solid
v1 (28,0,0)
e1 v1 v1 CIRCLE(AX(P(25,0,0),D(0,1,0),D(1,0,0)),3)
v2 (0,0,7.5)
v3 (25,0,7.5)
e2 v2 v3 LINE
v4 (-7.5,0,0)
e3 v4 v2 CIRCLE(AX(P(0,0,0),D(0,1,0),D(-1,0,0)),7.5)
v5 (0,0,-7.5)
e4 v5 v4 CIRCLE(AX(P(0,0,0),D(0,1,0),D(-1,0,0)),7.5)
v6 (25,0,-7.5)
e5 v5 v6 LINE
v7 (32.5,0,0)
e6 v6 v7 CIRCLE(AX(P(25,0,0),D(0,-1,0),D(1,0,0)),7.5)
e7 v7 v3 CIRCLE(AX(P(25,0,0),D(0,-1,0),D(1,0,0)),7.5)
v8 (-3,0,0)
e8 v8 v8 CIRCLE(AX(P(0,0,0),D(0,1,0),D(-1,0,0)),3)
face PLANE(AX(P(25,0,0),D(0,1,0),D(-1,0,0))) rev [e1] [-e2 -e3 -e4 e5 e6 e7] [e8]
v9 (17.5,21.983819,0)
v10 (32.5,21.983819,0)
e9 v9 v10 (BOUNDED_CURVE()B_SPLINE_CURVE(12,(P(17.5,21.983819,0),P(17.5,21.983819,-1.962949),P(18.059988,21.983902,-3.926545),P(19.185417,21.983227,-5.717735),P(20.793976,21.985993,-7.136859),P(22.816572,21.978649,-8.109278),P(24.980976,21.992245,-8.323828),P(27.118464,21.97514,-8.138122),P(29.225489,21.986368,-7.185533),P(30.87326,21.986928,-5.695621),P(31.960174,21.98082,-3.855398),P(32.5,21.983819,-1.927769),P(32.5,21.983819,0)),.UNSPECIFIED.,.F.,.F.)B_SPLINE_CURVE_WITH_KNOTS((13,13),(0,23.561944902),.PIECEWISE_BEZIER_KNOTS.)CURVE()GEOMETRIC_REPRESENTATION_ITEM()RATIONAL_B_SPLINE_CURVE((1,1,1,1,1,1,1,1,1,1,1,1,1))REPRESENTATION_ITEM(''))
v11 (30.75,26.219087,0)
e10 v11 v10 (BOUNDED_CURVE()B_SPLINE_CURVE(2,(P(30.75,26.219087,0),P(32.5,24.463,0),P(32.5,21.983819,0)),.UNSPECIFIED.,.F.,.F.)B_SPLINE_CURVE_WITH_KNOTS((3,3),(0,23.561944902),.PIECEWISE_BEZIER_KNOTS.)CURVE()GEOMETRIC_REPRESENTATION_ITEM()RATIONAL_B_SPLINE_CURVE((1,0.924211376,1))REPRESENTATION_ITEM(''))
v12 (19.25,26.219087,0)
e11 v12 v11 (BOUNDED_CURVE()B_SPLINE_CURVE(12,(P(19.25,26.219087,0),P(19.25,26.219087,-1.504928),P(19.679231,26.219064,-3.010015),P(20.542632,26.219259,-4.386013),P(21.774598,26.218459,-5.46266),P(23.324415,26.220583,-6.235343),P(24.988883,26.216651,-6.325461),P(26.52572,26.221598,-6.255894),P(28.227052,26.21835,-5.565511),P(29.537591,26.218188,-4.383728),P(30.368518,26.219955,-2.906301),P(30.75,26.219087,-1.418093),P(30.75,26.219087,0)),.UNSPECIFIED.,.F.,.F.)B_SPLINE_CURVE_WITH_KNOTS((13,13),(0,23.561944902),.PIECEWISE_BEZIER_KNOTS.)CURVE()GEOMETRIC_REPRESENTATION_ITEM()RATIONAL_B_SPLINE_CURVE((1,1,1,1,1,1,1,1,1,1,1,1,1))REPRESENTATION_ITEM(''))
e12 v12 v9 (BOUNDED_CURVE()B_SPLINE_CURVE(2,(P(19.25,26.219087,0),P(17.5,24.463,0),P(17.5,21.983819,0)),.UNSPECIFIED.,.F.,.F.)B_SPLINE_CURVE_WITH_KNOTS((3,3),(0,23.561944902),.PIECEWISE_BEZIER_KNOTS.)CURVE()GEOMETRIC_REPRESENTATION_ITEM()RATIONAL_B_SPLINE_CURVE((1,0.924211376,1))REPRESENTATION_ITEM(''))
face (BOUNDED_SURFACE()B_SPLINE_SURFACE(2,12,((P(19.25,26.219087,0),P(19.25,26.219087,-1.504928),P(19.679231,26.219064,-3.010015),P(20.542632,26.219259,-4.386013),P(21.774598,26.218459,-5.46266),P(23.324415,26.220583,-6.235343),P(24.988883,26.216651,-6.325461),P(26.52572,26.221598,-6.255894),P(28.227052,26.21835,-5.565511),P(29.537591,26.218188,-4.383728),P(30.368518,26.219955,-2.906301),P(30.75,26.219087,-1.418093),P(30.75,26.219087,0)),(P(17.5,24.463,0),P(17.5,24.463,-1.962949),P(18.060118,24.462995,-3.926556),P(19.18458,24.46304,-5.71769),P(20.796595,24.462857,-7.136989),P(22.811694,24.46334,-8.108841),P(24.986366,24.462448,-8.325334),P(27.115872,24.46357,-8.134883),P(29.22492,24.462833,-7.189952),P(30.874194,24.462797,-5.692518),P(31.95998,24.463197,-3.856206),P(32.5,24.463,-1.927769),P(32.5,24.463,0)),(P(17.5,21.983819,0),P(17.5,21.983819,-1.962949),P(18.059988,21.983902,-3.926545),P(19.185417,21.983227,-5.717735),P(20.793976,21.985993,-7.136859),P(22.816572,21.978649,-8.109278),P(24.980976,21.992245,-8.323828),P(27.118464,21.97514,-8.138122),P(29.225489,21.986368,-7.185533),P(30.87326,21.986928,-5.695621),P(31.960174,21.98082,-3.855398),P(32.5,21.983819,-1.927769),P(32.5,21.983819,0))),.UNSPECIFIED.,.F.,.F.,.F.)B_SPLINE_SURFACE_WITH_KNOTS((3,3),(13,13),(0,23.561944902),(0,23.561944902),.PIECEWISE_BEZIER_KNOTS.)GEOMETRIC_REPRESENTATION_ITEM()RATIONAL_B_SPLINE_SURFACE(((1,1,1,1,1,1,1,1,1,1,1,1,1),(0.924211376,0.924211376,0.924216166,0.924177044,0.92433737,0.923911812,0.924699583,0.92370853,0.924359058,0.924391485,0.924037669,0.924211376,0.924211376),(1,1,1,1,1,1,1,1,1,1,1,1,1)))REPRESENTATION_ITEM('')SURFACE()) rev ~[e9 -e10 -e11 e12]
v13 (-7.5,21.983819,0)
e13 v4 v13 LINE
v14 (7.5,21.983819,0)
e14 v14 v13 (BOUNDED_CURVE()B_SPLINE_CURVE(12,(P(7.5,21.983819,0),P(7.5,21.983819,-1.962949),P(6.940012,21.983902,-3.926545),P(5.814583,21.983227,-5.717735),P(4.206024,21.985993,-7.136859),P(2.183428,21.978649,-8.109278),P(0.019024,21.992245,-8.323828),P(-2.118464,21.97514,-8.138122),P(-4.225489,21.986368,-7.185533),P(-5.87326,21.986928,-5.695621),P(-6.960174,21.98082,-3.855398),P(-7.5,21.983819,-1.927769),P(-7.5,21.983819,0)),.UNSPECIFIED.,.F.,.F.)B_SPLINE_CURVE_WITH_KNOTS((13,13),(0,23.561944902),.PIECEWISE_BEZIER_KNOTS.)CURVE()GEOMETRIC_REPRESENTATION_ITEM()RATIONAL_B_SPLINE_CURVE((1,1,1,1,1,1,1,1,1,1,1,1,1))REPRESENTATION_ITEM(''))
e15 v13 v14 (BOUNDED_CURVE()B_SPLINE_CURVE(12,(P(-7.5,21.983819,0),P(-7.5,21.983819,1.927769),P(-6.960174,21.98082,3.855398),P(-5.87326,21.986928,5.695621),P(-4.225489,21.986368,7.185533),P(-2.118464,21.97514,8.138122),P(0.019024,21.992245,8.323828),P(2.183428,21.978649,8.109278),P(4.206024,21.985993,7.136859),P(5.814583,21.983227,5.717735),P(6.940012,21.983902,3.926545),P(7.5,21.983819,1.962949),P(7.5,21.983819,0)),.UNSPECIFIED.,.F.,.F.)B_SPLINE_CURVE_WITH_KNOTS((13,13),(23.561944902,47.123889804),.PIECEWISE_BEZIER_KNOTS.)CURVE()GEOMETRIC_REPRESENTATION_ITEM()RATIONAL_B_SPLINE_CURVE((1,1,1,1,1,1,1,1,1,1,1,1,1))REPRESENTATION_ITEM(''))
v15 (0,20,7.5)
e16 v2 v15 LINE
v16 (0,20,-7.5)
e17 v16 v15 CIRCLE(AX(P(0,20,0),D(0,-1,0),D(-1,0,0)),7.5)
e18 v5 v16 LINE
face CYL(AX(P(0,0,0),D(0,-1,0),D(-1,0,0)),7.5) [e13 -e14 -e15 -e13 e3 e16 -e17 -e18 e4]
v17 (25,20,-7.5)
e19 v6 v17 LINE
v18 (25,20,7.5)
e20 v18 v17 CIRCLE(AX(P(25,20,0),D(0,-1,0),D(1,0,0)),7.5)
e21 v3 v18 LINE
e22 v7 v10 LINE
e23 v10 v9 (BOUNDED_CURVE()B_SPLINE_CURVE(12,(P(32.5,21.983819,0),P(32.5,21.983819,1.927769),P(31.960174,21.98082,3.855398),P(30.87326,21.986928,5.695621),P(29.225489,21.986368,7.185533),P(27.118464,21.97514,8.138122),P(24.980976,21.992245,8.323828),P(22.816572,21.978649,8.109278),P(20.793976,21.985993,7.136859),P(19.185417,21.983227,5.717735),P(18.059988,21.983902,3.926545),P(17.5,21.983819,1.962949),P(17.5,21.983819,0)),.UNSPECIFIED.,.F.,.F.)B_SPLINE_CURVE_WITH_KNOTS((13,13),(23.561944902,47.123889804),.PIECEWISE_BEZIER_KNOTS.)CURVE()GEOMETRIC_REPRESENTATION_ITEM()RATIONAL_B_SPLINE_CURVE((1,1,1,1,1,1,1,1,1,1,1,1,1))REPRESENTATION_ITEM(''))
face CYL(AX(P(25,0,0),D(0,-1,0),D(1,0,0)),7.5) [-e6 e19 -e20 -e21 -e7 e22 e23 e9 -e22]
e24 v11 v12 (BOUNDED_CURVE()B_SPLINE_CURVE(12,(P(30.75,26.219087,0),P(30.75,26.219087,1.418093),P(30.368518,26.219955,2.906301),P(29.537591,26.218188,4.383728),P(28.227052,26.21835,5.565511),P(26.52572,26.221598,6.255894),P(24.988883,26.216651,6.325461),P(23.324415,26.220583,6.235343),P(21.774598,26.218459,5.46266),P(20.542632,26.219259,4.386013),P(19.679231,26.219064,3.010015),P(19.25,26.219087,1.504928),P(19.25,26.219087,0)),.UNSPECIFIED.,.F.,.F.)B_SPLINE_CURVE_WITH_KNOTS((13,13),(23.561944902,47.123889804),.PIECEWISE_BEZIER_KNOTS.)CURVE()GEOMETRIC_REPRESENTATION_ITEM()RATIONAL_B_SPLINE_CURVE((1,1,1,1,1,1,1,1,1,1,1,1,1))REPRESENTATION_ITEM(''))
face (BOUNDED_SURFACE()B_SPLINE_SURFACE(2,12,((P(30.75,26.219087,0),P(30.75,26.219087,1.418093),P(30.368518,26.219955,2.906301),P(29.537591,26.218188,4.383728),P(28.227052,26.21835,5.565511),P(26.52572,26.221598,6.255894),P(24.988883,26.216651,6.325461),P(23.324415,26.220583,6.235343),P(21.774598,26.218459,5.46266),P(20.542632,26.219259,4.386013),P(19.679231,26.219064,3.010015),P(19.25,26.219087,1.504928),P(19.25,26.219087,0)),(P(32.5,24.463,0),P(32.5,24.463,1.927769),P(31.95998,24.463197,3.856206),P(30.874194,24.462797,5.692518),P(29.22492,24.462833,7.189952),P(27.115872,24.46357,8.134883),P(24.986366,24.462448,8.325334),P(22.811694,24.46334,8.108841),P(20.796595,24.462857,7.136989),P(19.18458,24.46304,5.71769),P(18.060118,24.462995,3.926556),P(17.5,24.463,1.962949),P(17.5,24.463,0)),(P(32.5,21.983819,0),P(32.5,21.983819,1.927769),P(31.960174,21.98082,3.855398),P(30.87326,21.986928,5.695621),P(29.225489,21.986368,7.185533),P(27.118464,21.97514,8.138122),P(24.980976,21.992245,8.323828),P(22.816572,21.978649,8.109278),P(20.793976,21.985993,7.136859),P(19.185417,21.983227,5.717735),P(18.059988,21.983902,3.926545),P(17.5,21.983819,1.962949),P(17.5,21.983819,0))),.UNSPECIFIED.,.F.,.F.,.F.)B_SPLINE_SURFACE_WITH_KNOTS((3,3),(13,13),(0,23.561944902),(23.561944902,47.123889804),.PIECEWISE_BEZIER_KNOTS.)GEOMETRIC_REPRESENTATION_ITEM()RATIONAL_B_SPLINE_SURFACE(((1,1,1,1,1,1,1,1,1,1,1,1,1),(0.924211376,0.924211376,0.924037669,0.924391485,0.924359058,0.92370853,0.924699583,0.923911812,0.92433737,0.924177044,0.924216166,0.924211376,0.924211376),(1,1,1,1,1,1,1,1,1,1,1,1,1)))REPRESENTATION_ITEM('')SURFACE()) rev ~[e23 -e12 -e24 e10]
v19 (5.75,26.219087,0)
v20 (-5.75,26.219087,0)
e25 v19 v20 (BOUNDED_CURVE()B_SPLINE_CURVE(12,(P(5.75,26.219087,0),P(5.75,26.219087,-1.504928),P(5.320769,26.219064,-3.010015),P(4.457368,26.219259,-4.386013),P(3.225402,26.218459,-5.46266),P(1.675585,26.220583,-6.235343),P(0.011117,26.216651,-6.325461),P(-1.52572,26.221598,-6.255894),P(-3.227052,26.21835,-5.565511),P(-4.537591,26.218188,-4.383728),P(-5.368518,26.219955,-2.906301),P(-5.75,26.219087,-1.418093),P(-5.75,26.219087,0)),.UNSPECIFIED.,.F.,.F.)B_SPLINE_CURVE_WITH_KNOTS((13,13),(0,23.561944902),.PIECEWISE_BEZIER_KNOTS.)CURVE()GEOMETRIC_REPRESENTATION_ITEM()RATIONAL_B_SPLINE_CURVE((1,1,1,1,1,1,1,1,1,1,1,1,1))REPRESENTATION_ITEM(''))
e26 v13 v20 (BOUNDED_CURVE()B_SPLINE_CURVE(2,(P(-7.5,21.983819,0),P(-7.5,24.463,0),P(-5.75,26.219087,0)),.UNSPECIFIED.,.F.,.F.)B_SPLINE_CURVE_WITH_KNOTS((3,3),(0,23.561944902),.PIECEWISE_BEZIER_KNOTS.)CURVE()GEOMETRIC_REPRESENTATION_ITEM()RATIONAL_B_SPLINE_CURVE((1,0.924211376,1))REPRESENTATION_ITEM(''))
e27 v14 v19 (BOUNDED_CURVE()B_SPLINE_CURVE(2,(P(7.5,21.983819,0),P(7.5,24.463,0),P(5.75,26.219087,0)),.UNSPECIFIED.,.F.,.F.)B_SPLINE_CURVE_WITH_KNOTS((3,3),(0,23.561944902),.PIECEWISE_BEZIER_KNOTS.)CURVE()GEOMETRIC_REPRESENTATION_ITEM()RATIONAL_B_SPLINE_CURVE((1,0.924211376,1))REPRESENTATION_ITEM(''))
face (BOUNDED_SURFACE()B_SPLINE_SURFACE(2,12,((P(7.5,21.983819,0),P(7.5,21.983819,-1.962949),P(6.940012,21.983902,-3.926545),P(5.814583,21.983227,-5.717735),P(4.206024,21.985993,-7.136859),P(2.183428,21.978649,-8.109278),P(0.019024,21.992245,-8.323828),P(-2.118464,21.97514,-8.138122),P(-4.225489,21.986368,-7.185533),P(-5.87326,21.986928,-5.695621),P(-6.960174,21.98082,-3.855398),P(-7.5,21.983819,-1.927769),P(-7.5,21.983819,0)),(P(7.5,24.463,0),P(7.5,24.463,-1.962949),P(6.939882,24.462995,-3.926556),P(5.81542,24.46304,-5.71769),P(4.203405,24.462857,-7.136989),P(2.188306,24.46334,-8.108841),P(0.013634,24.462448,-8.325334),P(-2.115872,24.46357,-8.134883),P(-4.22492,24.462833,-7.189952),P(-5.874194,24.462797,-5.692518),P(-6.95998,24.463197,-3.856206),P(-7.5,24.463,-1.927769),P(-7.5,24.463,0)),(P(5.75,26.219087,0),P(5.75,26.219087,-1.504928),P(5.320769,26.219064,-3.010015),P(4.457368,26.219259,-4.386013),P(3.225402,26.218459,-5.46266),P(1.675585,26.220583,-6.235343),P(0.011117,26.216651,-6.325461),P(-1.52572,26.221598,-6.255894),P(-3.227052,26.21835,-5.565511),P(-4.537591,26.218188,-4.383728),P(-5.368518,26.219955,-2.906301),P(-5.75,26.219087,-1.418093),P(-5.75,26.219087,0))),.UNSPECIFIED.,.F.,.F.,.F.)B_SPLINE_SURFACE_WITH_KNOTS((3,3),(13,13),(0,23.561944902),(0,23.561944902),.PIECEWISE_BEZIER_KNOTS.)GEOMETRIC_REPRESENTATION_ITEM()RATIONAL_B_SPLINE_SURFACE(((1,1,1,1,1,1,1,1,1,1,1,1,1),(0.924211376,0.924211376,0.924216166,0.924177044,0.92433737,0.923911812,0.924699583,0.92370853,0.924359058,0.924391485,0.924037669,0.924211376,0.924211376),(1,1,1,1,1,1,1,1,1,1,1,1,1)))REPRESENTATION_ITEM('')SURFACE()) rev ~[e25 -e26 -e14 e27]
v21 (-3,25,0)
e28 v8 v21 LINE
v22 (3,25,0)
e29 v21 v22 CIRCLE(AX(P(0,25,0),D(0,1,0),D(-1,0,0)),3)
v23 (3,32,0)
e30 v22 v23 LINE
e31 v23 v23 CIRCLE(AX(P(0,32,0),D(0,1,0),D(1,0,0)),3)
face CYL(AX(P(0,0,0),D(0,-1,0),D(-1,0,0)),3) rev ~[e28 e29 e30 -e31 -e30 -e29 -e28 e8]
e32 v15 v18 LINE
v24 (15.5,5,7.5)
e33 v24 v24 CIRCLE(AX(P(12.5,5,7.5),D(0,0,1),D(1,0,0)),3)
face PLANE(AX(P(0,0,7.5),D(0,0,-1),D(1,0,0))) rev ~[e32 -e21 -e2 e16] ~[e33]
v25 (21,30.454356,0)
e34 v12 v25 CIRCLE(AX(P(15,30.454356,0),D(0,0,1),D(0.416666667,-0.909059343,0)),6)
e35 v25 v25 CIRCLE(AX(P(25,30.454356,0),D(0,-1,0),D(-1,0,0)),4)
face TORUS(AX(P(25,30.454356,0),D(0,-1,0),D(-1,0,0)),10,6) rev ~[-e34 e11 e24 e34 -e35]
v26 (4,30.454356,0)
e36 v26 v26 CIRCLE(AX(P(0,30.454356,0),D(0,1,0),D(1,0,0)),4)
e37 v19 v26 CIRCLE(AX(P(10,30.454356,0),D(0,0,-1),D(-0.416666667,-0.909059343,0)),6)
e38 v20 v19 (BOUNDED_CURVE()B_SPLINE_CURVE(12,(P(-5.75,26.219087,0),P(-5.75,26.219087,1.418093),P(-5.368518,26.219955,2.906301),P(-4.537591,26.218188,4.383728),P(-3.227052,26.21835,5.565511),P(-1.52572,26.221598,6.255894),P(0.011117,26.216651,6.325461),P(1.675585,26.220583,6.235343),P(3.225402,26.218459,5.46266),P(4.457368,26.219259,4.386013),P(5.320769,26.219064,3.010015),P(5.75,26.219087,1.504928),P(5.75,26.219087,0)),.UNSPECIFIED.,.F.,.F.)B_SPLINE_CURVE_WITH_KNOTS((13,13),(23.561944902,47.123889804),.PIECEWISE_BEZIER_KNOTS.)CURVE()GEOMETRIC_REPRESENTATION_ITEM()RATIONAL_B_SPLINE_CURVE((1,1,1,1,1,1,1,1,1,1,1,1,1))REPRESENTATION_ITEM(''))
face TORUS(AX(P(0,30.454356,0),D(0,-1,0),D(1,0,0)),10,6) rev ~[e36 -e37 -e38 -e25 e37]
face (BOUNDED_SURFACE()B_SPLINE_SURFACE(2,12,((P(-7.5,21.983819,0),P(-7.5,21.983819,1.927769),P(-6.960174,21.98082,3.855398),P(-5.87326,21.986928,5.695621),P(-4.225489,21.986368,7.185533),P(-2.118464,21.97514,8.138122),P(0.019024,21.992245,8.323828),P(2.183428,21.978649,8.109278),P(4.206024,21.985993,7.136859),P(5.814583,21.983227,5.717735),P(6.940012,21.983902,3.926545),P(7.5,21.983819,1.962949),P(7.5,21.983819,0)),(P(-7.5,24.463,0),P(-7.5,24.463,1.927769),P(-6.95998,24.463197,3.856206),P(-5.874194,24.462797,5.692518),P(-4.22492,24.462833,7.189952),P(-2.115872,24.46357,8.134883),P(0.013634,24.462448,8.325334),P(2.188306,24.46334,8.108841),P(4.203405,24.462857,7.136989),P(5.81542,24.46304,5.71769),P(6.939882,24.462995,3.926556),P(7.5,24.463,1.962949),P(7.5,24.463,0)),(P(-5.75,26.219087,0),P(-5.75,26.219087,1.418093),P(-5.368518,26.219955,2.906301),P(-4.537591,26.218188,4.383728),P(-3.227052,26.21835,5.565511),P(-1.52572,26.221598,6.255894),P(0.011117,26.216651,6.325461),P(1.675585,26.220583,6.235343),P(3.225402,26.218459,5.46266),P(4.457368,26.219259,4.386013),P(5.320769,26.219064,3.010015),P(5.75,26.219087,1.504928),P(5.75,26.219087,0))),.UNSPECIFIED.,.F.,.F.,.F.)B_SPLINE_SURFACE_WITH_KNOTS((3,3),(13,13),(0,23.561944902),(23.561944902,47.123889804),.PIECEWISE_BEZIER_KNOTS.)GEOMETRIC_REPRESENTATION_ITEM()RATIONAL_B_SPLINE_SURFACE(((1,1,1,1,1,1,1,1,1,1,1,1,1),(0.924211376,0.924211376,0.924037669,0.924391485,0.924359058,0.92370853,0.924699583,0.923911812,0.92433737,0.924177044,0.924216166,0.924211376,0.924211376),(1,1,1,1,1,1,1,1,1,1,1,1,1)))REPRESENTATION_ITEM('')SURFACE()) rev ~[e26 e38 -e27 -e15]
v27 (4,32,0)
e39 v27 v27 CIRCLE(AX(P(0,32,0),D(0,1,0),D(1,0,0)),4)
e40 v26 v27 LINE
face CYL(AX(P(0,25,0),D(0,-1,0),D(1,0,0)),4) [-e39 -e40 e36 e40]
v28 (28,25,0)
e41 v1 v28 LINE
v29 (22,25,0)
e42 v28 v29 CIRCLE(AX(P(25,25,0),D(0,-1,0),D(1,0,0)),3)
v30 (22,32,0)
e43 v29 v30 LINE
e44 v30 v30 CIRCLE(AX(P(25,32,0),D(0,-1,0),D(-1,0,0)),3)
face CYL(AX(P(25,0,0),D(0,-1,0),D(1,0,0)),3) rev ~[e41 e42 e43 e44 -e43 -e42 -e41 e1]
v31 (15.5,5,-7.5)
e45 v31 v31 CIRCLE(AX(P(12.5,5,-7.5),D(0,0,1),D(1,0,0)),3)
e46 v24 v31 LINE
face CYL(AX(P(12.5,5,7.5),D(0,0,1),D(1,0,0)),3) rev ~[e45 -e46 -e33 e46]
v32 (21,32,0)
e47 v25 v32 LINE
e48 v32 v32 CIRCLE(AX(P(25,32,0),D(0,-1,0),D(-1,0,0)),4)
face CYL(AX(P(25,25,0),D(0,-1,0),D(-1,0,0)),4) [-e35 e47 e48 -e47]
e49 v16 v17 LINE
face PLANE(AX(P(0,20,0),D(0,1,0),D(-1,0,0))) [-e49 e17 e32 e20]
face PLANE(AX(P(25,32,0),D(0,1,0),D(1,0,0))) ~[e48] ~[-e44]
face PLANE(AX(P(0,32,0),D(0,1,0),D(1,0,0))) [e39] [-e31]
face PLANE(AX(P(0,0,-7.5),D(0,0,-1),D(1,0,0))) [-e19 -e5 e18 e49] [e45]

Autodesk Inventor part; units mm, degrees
ref_plane "XZ Plane" through (0, 0, 0) normal (0, 1, 0) x (-1, 0, 0)
ref_plane "XY Plane" through (0, 0, 0) normal (0, 0, 1) x (1, 0, 0)
sketch "Sketch1" plane through (0, 0, 0) normal (0, 1, 0) x (-1, 0, 0)
  circle A0 centre (0, 0) radius 7.5
  circle A1 centre (0, 0) radius 3
  dimension "d0" = 15
  dimension "d1" = 6
extrude "Extrusion1" add sketch "Sketch1" along normal blind 25
sketch "Sketch2" plane through (0, 25, 0) normal (0, 1, 0) x (1, 0, 0)
  circle A0 centre (0, 0) radius 3 projected
  circle A1 centre (0, 0) radius 2.75
  circle A2 centre (0, 0) radius 4
  dimension "d4" = 5.5
  dimension "d5" = 8
extrude "Extrusion2" add sketch "Sketch2" along normal blind 7 contours A2
fillet "Fillet1" radius 6 1 edges at (-4, 25, 0)
fillet "Fillet2" radius 6 2 edges at (0, 25, -7.5) (0, 25, 7.5)
ref_plane "Work Plane1" through (12.5, 0, 0) normal (1, 0, 0) x (0, 1, 0)
mirror "Mirror1" about plane through (12.5, 0, 0) normal (1, 0, 0) of "Extrusion1", "Extrusion2", "Fillet1", "Fillet2"
sketch "Sketch3" plane through (0, 0, 0) normal (0, 1, 0) x (-1, 0, 0)
  circle A0 centre (-25, 0) radius 3 projected
  line L0 (-25, 0) -> (-25, 3)
  line L1 (-25, 0) -> (-25, -3)
  line L2 (0, 0) -> (0, -3)
  circle A1 centre (0, 0) radius 3 projected
  line L3 (0, 0) -> (0, 3)
  line L4 (-25, 3) -> (0, 3)
  line L5 (0, 3) -> (0, 7.5)
  line L6 (0, 7.5) -> (-25, 7.5)
  line L7 (-25, 7.5) -> (-25, 3)
  line L8 (-25, -3) -> (0, -3)
  line L9 (0, -3) -> (0, -7.5)
  line L10 (0, -7.5) -> (-25, -7.5)
  line L11 (-25, -7.5) -> (-25, -3)
  point P0 (0, -3)
  point P1 (0, 3)
  dimension "d11" = 25
  dimension "d12" = 4.5
  dimension "d13" = 25
  dimension "d14" = 4.5
extrude "Extrusion3" add sketch "Sketch3" along normal blind 20 contours A0 L4 A1 L8 | L7 L6 L5 L4 | L8 L9 L10 L11
sketch "Sketch4" plane through (0, 0, 7.5) normal (0, 0, 1) x (1, 0, 0)
  line L0 (25, 20) -> (0, 20) projected
  circle A0 centre (12.5, 5) radius 3
  line L1 (0, 0) -> (25, 0) projected
  line L2 (0, 0) -> (0, 20) projected
  point P0 (25, 15)
  point P1 (0, 15)
  dimension "d18" = 6
  dimension "d21" = 5
  dimension "d22" = 12.5
extrude "Extrusion4" cut sketch "Sketch4" against normal through all
properties part number "4mm_Roller_Spacer_full"
